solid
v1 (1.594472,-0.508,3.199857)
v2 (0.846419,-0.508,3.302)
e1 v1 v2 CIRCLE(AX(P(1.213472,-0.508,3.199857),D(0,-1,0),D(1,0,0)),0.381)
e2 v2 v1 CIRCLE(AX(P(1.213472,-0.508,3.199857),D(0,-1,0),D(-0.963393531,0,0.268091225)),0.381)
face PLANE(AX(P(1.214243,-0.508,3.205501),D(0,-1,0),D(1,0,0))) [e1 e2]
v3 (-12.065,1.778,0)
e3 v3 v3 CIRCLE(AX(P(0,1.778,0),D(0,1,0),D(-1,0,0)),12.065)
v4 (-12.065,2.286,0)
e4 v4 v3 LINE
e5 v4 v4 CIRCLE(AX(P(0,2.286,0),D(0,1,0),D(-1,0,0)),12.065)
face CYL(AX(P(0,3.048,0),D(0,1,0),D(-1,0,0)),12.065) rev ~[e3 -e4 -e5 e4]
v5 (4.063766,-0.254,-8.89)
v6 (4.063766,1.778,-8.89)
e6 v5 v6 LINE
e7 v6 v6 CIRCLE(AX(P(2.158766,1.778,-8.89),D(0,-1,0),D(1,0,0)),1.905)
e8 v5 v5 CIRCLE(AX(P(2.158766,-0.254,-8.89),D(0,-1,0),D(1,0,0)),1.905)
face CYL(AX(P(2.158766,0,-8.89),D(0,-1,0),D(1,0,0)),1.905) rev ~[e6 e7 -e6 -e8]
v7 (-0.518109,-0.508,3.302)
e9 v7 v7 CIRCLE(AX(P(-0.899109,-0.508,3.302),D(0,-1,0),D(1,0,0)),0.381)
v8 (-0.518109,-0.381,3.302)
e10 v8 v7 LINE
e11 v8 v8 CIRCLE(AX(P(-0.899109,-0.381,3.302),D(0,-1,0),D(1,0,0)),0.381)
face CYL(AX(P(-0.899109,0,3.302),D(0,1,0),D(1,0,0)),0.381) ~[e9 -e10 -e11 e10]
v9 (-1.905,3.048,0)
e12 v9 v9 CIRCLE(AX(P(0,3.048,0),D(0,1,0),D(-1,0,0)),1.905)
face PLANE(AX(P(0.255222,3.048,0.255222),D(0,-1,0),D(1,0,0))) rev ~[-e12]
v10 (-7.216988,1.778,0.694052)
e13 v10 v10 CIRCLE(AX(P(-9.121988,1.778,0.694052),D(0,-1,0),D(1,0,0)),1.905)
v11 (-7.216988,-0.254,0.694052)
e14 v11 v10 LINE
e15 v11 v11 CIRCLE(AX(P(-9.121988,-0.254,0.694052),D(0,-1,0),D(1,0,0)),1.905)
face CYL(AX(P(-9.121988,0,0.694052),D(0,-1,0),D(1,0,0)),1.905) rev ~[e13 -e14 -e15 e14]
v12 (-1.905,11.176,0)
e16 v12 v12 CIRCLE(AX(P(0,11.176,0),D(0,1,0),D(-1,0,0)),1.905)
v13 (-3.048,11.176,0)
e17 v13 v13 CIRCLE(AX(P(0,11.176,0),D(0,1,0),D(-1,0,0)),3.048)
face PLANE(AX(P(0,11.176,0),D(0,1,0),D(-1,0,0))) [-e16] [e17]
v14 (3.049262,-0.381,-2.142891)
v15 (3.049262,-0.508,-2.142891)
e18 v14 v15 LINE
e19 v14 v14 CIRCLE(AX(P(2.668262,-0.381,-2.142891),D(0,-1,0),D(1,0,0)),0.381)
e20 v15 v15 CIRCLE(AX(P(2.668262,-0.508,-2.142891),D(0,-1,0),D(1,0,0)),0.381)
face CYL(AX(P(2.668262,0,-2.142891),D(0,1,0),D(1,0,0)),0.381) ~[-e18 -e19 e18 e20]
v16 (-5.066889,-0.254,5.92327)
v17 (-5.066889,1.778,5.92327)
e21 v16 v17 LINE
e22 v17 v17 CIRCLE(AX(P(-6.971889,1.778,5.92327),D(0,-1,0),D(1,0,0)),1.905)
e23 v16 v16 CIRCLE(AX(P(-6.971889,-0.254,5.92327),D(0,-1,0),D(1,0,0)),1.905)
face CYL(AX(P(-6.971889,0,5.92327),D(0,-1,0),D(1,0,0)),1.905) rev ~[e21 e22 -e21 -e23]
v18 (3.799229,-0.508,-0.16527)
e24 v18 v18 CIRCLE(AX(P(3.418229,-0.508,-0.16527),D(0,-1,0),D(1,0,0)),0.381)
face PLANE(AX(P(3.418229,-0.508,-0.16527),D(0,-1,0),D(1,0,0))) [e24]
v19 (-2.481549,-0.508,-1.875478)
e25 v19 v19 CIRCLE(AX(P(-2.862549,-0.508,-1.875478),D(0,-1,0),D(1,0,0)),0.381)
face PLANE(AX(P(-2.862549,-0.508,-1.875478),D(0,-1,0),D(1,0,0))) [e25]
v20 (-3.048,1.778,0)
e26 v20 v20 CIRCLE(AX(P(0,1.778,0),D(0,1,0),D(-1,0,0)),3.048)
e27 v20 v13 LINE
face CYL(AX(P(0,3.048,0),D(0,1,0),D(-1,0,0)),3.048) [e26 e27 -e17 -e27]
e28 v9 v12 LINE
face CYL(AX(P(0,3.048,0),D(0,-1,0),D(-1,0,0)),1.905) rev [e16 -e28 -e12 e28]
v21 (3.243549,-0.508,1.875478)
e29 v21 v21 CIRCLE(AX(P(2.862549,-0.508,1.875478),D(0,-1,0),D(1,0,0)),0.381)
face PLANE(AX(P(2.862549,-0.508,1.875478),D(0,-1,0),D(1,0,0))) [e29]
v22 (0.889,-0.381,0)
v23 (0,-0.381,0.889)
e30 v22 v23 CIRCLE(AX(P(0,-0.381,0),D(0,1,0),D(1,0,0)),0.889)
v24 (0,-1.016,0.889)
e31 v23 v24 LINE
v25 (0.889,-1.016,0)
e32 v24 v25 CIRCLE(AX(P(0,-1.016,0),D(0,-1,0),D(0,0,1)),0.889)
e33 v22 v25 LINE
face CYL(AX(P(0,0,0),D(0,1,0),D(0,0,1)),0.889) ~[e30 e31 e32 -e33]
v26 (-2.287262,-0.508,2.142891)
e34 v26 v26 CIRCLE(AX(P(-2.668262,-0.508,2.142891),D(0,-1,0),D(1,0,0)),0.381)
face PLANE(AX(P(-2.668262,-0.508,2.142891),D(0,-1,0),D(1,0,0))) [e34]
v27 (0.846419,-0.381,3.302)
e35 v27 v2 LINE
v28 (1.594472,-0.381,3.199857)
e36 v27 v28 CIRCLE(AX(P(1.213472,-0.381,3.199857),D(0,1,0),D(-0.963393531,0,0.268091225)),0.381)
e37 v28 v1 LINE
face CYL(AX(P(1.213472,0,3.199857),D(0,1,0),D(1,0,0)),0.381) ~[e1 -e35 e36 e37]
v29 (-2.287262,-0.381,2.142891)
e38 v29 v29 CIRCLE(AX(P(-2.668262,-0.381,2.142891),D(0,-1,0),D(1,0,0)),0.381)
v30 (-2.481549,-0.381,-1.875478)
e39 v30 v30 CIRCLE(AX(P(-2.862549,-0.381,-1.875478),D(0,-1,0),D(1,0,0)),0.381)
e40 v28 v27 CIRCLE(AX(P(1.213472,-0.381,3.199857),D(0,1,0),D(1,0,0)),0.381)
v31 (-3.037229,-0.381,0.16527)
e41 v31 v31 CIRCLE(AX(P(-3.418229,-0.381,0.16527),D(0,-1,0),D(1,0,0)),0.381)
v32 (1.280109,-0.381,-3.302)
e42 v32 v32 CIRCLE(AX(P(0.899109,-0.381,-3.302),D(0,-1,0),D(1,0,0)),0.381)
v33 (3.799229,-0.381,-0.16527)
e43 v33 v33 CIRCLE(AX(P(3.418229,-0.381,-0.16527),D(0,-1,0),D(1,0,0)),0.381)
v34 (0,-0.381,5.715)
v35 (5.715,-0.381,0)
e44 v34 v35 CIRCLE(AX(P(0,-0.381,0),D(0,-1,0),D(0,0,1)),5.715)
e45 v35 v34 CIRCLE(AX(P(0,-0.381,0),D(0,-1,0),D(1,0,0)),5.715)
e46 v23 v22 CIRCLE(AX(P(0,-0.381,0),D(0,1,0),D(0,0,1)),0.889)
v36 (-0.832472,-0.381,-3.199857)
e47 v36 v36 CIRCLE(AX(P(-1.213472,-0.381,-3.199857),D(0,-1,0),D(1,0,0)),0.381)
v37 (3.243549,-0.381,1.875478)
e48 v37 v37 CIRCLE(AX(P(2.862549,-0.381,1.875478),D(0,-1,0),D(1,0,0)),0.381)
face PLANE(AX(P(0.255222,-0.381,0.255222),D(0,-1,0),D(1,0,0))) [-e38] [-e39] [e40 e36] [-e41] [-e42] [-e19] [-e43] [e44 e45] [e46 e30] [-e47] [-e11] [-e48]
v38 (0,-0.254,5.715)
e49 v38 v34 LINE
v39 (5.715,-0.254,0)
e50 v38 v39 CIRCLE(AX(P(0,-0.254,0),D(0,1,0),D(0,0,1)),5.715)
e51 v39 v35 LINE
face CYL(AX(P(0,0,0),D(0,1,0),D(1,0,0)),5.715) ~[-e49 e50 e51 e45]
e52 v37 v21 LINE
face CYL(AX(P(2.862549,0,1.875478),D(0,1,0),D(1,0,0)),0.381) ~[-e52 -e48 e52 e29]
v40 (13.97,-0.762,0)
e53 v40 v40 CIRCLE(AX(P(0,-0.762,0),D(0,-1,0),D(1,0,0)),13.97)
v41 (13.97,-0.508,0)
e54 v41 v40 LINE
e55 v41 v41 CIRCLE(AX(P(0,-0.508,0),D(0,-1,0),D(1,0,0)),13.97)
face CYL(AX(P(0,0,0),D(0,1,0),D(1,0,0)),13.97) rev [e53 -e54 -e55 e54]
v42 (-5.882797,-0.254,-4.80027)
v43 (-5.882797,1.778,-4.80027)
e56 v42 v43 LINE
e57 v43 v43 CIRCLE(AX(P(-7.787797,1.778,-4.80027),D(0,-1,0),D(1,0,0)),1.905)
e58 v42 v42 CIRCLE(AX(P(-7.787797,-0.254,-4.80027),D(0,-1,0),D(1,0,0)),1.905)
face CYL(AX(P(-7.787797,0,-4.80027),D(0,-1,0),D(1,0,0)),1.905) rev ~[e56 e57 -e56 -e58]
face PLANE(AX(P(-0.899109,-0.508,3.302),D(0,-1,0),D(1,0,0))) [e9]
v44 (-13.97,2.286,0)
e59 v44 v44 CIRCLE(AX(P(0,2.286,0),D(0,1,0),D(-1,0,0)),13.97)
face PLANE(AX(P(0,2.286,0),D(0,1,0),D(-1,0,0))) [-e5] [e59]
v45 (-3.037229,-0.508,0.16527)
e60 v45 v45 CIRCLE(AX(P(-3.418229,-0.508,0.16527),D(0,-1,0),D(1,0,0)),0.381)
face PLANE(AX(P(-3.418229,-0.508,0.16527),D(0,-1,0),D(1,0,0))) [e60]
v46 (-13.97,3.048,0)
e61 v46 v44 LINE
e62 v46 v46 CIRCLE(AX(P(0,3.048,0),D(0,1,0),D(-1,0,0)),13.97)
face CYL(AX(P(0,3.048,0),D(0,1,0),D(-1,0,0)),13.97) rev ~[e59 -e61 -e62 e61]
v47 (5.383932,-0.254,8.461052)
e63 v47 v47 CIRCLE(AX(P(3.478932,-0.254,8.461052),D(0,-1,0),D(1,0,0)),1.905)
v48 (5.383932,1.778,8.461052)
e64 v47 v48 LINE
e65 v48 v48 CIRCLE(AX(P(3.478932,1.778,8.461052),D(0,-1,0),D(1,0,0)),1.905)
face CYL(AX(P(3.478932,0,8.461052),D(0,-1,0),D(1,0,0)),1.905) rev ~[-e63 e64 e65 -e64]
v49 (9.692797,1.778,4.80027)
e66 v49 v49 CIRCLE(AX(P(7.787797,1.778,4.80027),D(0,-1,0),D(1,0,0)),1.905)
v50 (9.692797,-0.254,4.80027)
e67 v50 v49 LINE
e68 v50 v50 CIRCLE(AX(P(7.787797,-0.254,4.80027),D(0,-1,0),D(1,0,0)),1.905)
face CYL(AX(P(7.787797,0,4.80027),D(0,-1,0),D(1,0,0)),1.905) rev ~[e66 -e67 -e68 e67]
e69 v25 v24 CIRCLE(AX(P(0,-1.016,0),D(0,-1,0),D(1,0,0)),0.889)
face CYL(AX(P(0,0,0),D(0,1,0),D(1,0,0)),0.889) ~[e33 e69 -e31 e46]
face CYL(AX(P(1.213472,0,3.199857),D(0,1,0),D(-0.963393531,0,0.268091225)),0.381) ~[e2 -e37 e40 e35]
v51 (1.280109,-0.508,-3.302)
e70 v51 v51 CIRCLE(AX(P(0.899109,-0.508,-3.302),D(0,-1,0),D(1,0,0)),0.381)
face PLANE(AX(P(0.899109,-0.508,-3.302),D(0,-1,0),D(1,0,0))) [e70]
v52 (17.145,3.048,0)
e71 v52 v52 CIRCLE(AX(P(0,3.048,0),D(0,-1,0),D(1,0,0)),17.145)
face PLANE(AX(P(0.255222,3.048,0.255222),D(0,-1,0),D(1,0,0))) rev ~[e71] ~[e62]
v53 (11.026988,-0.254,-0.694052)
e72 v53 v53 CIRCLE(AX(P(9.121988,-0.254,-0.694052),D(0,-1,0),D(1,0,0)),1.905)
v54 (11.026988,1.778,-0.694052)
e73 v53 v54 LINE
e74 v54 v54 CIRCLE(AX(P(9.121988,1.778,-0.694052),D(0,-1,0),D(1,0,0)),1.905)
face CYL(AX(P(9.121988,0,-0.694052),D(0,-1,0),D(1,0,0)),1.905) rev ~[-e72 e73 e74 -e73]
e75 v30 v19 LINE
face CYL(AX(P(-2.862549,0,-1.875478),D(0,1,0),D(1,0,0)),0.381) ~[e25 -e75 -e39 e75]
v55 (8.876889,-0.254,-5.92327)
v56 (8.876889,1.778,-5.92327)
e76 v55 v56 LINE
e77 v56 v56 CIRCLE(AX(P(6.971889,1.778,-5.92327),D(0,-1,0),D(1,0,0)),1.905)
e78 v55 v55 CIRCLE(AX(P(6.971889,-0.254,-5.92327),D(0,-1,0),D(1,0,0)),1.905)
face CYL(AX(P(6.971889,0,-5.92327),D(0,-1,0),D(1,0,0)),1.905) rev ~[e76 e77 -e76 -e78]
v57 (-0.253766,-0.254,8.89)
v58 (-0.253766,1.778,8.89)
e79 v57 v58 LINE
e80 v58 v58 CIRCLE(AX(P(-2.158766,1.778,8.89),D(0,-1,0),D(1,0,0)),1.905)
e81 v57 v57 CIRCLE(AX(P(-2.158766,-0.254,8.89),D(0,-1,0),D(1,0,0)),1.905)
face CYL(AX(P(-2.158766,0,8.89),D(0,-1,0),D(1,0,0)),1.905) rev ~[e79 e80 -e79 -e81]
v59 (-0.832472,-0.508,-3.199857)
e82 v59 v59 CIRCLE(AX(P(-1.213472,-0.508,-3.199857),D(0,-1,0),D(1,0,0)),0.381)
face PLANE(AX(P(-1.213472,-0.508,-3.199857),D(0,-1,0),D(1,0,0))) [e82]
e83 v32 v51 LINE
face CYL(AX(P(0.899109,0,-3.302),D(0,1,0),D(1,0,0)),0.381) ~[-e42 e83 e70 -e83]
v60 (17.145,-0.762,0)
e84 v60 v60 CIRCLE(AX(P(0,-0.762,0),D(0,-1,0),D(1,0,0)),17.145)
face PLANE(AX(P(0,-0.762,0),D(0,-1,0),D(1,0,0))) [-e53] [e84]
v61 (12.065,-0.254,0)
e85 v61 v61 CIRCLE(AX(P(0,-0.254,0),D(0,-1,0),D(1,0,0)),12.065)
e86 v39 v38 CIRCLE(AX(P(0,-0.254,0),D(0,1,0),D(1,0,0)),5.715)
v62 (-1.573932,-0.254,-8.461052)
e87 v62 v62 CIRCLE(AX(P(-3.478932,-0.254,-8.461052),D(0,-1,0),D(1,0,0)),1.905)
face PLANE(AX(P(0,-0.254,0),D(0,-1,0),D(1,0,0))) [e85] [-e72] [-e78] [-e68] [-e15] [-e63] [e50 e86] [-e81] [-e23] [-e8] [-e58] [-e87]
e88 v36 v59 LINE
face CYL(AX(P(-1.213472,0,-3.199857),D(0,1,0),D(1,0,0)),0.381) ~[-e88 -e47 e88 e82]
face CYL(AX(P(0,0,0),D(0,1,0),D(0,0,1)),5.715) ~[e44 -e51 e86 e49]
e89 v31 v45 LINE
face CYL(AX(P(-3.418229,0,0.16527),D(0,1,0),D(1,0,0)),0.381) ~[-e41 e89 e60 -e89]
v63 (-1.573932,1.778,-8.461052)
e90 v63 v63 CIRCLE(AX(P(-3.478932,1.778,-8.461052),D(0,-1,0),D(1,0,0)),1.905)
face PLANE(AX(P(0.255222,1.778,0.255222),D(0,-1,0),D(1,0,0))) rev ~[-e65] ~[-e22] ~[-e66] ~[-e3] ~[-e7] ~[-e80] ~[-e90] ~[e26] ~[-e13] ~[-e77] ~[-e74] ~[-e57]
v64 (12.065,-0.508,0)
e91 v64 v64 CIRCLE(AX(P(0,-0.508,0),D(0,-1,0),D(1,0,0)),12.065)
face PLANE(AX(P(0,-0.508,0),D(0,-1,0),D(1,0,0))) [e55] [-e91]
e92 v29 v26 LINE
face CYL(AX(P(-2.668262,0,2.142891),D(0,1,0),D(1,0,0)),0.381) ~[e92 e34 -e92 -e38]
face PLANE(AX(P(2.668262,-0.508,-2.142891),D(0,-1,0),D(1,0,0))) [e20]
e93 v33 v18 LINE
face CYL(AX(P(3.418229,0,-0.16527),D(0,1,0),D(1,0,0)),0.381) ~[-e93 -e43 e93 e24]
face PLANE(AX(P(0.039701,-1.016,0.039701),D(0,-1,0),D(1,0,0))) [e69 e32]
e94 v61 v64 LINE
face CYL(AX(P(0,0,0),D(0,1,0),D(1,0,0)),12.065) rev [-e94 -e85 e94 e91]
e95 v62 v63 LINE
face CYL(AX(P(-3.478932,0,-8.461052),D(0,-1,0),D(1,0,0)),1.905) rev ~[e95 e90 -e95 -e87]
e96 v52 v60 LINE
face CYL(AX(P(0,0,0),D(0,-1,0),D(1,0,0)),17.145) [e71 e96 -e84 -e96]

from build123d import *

# Parameters (mm, degrees)
F0_R      = 17.145
F0_R_2    = 13.97
F1_DEPTH  = 0.762
F0_R_3    = 12.065
F2_DEPTH  = 0.508
F3_DEPTH  = 0.254
F0_R_4    = 0.381
F5_DEPTH  = 0.381
F6_DEPTH  = 0.508
F7_DEPTH  = 1.016
F8_R      = 1.905
F9_DEPTH  = 25.4
F10_DEPTH = 3.048
F11_R     = 3.048
F11_R_2   = 1.905
F12_DEPTH = 8.128
F13_R     = 13.97
F13_R_2   = 12.065
F14_DEPTH = 0.762
F15_DEPTH = 1.27


# Not quite as in the source:
# - the program builds the solid bodies; features that only make, move or delete a surface that nothing else refers to are left out


with BuildPart() as f1:
    # F0 (on Front) → F1 (new body)
    with BuildSketch(Plane.XZ):
        Circle(F0_R)
        Circle(F0_R_2, mode=Mode.SUBTRACT)
    extrude(amount=F1_DEPTH)

    # F0 (on Front) → F2 (join)
    with BuildSketch(Plane.XZ):
        Circle(F0_R_2)
        Circle(F0_R_3, mode=Mode.SUBTRACT)
    extrude(amount=F2_DEPTH)

    # F0 (on Front) → F3 (join)
    with BuildSketch(Plane.XZ):
        Circle(F0_R_3)
        with BuildLine():
            ThreePointArc((0, 5.715), (4.0411152545, 4.0411152545), (5.715, 0))
            ThreePointArc((5.715, 0), (-4.0411152545, -4.0411152545), (0, 5.715))
        make_face(mode=Mode.SUBTRACT)
    extrude(amount=F3_DEPTH)

    # F0 (on Front) → F5 (join)
    with BuildSketch(Plane.XZ):
        with BuildLine():
            ThreePointArc((0, 5.715), (-4.0411152545, -4.0411152545), (5.715, 0))
            ThreePointArc((5.715, 0), (4.0411152545, 4.0411152545), (0, 5.715))
        make_face()
        with Locations((-1.2134722805, -3.1998572434)):
            Circle(F0_R_4, mode=Mode.SUBTRACT)
        with Locations((-2.8625485942, -1.8754777789)):
            Circle(F0_R_4, mode=Mode.SUBTRACT)
        with Locations((0.8991092, -3.302)):
            Circle(F0_R_4, mode=Mode.SUBTRACT)
        with Locations((2.6682615257, -2.1428909875)):
            Circle(F0_R_4, mode=Mode.SUBTRACT)
        with Locations((3.4182286394, -0.1652704519)):
            Circle(F0_R_4, mode=Mode.SUBTRACT)
        with Locations((-3.4182286394, 0.1652704519)):
            Circle(F0_R_4, mode=Mode.SUBTRACT)
        with Locations((-2.6682615257, 2.1428909875)):
            Circle(F0_R_4, mode=Mode.SUBTRACT)
        with Locations((-0.8991092, 3.302)):
            Circle(F0_R_4, mode=Mode.SUBTRACT)
        with BuildLine():
            ThreePointArc((0.889, 0), (-0.6286179285, -0.6286179285), (0, 0.889))
            ThreePointArc((0, 0.889), (0.6286179285, 0.6286179285), (0.889, 0))
        make_face(mode=Mode.SUBTRACT)
        with Locations((2.8625485942, 1.8754777789)):
            Circle(F0_R_4, mode=Mode.SUBTRACT)
        with BuildLine():
            ThreePointArc((1.5944722805, 3.1998572434), (1.161927001, 2.8223601121), (0.8464193452, 3.302))
            ThreePointArc((0.8464193452, 3.302), (1.2650175599, 3.5773543747), (1.5944722805, 3.1998572434))
        make_face(mode=Mode.SUBTRACT)
    extrude(amount=F5_DEPTH)

    # F0 (on Front) → F6 (join)
    with BuildSketch(Plane.XZ):
        with Locations((-0.8991092, 3.302)):
            Circle(F0_R_4)
        with BuildLine():
            ThreePointArc((1.5944722805, 3.1998572434), (1.2650175599, 3.5773543747), (0.8464193452, 3.302))
            ThreePointArc((0.8464193452, 3.302), (1.161927001, 2.8223601121), (1.5944722805, 3.1998572434))
        make_face()
        with Locations((-2.6682615257, 2.1428909875)):
            Circle(F0_R_4)
        with Locations((2.8625485942, 1.8754777789)):
            Circle(F0_R_4)
        with Locations((3.4182286394, -0.1652704519)):
            Circle(F0_R_4)
        with Locations((-1.2134722805, -3.1998572434)):
            Circle(F0_R_4)
        with Locations((-2.8625485942, -1.8754777789)):
            Circle(F0_R_4)
        with Locations((-3.4182286394, 0.1652704519)):
            Circle(F0_R_4)
        with Locations((2.6682615257, -2.1428909875)):
            Circle(F0_R_4)
        with Locations((0.8991092, -3.302)):
            Circle(F0_R_4)
    extrude(amount=F6_DEPTH)

    # F0 (on Front) → F7 (join)
    with BuildSketch(Plane.XZ):
        with BuildLine():
            ThreePointArc((0.889, 0), (0.6286179285, 0.6286179285), (0, 0.889))
            ThreePointArc((0, 0.889), (-0.6286179285, -0.6286179285), (0.889, 0))
        make_face()
    extrude(amount=F7_DEPTH)

    # F8 (on face) → F9 (cut)
    with BuildSketch(Plane.XZ.offset(0.254)):
        with Locations((-2.1587662638, 8.89)):
            Circle(F8_R)
        with Locations((-6.9718894872, 5.923270107)):
            Circle(F8_R)
        with Locations((-9.1219878923, 0.6940523577)):
            Circle(F8_R)
        with Locations((-7.7877969675, -4.8002698023)):
            Circle(F8_R)
        with Locations((-3.4789322986, -8.461052053)):
            Circle(F8_R)
        with Locations((2.1587662638, -8.89)):
            Circle(F8_R)
        with Locations((6.9718894872, -5.923270107)):
            Circle(F8_R)
        with Locations((9.1219878923, -0.6940523577)):
            Circle(F8_R)
        with Locations((7.7877969675, 4.8002698023)):
            Circle(F8_R)
        with Locations((3.4789322986, 8.461052053)):
            Circle(F8_R)
    extrude(amount=-F9_DEPTH, mode=Mode.SUBTRACT)

    # F10 (add): a face of the model
    f10_faces = [f1.faces().sort_by_distance(p)[0] for p in [
        (0, 0, 0),
    ]]
    extrude(f10_faces, amount=F10_DEPTH)

    # F11 (on face) → F12 (join)
    with BuildSketch(Plane(origin=(0, 3.048, 0), x_dir=(-1, 0, 0), z_dir=(0, 1, 0))):
        Circle(F11_R)
        Circle(F11_R_2, mode=Mode.SUBTRACT)
    extrude(amount=F12_DEPTH)

    # F13 (on face) → F14 (cut)
    with BuildSketch(Plane(origin=(0, 3.048, 0), x_dir=(-1, 0, 0), z_dir=(0, 1, 0))):
        Circle(F13_R)
        Circle(F13_R_2, mode=Mode.SUBTRACT)
    extrude(amount=-F14_DEPTH, mode=Mode.SUBTRACT)

    # F15 (cut): a face of the model
    f15_faces = [f1.faces().sort_by_distance(p)[0] for p in [
        (11.7237502674, 3.048, 0),
    ]]
    extrude(f15_faces, amount=-F15_DEPTH, mode=Mode.SUBTRACT)


solid = f1.part
